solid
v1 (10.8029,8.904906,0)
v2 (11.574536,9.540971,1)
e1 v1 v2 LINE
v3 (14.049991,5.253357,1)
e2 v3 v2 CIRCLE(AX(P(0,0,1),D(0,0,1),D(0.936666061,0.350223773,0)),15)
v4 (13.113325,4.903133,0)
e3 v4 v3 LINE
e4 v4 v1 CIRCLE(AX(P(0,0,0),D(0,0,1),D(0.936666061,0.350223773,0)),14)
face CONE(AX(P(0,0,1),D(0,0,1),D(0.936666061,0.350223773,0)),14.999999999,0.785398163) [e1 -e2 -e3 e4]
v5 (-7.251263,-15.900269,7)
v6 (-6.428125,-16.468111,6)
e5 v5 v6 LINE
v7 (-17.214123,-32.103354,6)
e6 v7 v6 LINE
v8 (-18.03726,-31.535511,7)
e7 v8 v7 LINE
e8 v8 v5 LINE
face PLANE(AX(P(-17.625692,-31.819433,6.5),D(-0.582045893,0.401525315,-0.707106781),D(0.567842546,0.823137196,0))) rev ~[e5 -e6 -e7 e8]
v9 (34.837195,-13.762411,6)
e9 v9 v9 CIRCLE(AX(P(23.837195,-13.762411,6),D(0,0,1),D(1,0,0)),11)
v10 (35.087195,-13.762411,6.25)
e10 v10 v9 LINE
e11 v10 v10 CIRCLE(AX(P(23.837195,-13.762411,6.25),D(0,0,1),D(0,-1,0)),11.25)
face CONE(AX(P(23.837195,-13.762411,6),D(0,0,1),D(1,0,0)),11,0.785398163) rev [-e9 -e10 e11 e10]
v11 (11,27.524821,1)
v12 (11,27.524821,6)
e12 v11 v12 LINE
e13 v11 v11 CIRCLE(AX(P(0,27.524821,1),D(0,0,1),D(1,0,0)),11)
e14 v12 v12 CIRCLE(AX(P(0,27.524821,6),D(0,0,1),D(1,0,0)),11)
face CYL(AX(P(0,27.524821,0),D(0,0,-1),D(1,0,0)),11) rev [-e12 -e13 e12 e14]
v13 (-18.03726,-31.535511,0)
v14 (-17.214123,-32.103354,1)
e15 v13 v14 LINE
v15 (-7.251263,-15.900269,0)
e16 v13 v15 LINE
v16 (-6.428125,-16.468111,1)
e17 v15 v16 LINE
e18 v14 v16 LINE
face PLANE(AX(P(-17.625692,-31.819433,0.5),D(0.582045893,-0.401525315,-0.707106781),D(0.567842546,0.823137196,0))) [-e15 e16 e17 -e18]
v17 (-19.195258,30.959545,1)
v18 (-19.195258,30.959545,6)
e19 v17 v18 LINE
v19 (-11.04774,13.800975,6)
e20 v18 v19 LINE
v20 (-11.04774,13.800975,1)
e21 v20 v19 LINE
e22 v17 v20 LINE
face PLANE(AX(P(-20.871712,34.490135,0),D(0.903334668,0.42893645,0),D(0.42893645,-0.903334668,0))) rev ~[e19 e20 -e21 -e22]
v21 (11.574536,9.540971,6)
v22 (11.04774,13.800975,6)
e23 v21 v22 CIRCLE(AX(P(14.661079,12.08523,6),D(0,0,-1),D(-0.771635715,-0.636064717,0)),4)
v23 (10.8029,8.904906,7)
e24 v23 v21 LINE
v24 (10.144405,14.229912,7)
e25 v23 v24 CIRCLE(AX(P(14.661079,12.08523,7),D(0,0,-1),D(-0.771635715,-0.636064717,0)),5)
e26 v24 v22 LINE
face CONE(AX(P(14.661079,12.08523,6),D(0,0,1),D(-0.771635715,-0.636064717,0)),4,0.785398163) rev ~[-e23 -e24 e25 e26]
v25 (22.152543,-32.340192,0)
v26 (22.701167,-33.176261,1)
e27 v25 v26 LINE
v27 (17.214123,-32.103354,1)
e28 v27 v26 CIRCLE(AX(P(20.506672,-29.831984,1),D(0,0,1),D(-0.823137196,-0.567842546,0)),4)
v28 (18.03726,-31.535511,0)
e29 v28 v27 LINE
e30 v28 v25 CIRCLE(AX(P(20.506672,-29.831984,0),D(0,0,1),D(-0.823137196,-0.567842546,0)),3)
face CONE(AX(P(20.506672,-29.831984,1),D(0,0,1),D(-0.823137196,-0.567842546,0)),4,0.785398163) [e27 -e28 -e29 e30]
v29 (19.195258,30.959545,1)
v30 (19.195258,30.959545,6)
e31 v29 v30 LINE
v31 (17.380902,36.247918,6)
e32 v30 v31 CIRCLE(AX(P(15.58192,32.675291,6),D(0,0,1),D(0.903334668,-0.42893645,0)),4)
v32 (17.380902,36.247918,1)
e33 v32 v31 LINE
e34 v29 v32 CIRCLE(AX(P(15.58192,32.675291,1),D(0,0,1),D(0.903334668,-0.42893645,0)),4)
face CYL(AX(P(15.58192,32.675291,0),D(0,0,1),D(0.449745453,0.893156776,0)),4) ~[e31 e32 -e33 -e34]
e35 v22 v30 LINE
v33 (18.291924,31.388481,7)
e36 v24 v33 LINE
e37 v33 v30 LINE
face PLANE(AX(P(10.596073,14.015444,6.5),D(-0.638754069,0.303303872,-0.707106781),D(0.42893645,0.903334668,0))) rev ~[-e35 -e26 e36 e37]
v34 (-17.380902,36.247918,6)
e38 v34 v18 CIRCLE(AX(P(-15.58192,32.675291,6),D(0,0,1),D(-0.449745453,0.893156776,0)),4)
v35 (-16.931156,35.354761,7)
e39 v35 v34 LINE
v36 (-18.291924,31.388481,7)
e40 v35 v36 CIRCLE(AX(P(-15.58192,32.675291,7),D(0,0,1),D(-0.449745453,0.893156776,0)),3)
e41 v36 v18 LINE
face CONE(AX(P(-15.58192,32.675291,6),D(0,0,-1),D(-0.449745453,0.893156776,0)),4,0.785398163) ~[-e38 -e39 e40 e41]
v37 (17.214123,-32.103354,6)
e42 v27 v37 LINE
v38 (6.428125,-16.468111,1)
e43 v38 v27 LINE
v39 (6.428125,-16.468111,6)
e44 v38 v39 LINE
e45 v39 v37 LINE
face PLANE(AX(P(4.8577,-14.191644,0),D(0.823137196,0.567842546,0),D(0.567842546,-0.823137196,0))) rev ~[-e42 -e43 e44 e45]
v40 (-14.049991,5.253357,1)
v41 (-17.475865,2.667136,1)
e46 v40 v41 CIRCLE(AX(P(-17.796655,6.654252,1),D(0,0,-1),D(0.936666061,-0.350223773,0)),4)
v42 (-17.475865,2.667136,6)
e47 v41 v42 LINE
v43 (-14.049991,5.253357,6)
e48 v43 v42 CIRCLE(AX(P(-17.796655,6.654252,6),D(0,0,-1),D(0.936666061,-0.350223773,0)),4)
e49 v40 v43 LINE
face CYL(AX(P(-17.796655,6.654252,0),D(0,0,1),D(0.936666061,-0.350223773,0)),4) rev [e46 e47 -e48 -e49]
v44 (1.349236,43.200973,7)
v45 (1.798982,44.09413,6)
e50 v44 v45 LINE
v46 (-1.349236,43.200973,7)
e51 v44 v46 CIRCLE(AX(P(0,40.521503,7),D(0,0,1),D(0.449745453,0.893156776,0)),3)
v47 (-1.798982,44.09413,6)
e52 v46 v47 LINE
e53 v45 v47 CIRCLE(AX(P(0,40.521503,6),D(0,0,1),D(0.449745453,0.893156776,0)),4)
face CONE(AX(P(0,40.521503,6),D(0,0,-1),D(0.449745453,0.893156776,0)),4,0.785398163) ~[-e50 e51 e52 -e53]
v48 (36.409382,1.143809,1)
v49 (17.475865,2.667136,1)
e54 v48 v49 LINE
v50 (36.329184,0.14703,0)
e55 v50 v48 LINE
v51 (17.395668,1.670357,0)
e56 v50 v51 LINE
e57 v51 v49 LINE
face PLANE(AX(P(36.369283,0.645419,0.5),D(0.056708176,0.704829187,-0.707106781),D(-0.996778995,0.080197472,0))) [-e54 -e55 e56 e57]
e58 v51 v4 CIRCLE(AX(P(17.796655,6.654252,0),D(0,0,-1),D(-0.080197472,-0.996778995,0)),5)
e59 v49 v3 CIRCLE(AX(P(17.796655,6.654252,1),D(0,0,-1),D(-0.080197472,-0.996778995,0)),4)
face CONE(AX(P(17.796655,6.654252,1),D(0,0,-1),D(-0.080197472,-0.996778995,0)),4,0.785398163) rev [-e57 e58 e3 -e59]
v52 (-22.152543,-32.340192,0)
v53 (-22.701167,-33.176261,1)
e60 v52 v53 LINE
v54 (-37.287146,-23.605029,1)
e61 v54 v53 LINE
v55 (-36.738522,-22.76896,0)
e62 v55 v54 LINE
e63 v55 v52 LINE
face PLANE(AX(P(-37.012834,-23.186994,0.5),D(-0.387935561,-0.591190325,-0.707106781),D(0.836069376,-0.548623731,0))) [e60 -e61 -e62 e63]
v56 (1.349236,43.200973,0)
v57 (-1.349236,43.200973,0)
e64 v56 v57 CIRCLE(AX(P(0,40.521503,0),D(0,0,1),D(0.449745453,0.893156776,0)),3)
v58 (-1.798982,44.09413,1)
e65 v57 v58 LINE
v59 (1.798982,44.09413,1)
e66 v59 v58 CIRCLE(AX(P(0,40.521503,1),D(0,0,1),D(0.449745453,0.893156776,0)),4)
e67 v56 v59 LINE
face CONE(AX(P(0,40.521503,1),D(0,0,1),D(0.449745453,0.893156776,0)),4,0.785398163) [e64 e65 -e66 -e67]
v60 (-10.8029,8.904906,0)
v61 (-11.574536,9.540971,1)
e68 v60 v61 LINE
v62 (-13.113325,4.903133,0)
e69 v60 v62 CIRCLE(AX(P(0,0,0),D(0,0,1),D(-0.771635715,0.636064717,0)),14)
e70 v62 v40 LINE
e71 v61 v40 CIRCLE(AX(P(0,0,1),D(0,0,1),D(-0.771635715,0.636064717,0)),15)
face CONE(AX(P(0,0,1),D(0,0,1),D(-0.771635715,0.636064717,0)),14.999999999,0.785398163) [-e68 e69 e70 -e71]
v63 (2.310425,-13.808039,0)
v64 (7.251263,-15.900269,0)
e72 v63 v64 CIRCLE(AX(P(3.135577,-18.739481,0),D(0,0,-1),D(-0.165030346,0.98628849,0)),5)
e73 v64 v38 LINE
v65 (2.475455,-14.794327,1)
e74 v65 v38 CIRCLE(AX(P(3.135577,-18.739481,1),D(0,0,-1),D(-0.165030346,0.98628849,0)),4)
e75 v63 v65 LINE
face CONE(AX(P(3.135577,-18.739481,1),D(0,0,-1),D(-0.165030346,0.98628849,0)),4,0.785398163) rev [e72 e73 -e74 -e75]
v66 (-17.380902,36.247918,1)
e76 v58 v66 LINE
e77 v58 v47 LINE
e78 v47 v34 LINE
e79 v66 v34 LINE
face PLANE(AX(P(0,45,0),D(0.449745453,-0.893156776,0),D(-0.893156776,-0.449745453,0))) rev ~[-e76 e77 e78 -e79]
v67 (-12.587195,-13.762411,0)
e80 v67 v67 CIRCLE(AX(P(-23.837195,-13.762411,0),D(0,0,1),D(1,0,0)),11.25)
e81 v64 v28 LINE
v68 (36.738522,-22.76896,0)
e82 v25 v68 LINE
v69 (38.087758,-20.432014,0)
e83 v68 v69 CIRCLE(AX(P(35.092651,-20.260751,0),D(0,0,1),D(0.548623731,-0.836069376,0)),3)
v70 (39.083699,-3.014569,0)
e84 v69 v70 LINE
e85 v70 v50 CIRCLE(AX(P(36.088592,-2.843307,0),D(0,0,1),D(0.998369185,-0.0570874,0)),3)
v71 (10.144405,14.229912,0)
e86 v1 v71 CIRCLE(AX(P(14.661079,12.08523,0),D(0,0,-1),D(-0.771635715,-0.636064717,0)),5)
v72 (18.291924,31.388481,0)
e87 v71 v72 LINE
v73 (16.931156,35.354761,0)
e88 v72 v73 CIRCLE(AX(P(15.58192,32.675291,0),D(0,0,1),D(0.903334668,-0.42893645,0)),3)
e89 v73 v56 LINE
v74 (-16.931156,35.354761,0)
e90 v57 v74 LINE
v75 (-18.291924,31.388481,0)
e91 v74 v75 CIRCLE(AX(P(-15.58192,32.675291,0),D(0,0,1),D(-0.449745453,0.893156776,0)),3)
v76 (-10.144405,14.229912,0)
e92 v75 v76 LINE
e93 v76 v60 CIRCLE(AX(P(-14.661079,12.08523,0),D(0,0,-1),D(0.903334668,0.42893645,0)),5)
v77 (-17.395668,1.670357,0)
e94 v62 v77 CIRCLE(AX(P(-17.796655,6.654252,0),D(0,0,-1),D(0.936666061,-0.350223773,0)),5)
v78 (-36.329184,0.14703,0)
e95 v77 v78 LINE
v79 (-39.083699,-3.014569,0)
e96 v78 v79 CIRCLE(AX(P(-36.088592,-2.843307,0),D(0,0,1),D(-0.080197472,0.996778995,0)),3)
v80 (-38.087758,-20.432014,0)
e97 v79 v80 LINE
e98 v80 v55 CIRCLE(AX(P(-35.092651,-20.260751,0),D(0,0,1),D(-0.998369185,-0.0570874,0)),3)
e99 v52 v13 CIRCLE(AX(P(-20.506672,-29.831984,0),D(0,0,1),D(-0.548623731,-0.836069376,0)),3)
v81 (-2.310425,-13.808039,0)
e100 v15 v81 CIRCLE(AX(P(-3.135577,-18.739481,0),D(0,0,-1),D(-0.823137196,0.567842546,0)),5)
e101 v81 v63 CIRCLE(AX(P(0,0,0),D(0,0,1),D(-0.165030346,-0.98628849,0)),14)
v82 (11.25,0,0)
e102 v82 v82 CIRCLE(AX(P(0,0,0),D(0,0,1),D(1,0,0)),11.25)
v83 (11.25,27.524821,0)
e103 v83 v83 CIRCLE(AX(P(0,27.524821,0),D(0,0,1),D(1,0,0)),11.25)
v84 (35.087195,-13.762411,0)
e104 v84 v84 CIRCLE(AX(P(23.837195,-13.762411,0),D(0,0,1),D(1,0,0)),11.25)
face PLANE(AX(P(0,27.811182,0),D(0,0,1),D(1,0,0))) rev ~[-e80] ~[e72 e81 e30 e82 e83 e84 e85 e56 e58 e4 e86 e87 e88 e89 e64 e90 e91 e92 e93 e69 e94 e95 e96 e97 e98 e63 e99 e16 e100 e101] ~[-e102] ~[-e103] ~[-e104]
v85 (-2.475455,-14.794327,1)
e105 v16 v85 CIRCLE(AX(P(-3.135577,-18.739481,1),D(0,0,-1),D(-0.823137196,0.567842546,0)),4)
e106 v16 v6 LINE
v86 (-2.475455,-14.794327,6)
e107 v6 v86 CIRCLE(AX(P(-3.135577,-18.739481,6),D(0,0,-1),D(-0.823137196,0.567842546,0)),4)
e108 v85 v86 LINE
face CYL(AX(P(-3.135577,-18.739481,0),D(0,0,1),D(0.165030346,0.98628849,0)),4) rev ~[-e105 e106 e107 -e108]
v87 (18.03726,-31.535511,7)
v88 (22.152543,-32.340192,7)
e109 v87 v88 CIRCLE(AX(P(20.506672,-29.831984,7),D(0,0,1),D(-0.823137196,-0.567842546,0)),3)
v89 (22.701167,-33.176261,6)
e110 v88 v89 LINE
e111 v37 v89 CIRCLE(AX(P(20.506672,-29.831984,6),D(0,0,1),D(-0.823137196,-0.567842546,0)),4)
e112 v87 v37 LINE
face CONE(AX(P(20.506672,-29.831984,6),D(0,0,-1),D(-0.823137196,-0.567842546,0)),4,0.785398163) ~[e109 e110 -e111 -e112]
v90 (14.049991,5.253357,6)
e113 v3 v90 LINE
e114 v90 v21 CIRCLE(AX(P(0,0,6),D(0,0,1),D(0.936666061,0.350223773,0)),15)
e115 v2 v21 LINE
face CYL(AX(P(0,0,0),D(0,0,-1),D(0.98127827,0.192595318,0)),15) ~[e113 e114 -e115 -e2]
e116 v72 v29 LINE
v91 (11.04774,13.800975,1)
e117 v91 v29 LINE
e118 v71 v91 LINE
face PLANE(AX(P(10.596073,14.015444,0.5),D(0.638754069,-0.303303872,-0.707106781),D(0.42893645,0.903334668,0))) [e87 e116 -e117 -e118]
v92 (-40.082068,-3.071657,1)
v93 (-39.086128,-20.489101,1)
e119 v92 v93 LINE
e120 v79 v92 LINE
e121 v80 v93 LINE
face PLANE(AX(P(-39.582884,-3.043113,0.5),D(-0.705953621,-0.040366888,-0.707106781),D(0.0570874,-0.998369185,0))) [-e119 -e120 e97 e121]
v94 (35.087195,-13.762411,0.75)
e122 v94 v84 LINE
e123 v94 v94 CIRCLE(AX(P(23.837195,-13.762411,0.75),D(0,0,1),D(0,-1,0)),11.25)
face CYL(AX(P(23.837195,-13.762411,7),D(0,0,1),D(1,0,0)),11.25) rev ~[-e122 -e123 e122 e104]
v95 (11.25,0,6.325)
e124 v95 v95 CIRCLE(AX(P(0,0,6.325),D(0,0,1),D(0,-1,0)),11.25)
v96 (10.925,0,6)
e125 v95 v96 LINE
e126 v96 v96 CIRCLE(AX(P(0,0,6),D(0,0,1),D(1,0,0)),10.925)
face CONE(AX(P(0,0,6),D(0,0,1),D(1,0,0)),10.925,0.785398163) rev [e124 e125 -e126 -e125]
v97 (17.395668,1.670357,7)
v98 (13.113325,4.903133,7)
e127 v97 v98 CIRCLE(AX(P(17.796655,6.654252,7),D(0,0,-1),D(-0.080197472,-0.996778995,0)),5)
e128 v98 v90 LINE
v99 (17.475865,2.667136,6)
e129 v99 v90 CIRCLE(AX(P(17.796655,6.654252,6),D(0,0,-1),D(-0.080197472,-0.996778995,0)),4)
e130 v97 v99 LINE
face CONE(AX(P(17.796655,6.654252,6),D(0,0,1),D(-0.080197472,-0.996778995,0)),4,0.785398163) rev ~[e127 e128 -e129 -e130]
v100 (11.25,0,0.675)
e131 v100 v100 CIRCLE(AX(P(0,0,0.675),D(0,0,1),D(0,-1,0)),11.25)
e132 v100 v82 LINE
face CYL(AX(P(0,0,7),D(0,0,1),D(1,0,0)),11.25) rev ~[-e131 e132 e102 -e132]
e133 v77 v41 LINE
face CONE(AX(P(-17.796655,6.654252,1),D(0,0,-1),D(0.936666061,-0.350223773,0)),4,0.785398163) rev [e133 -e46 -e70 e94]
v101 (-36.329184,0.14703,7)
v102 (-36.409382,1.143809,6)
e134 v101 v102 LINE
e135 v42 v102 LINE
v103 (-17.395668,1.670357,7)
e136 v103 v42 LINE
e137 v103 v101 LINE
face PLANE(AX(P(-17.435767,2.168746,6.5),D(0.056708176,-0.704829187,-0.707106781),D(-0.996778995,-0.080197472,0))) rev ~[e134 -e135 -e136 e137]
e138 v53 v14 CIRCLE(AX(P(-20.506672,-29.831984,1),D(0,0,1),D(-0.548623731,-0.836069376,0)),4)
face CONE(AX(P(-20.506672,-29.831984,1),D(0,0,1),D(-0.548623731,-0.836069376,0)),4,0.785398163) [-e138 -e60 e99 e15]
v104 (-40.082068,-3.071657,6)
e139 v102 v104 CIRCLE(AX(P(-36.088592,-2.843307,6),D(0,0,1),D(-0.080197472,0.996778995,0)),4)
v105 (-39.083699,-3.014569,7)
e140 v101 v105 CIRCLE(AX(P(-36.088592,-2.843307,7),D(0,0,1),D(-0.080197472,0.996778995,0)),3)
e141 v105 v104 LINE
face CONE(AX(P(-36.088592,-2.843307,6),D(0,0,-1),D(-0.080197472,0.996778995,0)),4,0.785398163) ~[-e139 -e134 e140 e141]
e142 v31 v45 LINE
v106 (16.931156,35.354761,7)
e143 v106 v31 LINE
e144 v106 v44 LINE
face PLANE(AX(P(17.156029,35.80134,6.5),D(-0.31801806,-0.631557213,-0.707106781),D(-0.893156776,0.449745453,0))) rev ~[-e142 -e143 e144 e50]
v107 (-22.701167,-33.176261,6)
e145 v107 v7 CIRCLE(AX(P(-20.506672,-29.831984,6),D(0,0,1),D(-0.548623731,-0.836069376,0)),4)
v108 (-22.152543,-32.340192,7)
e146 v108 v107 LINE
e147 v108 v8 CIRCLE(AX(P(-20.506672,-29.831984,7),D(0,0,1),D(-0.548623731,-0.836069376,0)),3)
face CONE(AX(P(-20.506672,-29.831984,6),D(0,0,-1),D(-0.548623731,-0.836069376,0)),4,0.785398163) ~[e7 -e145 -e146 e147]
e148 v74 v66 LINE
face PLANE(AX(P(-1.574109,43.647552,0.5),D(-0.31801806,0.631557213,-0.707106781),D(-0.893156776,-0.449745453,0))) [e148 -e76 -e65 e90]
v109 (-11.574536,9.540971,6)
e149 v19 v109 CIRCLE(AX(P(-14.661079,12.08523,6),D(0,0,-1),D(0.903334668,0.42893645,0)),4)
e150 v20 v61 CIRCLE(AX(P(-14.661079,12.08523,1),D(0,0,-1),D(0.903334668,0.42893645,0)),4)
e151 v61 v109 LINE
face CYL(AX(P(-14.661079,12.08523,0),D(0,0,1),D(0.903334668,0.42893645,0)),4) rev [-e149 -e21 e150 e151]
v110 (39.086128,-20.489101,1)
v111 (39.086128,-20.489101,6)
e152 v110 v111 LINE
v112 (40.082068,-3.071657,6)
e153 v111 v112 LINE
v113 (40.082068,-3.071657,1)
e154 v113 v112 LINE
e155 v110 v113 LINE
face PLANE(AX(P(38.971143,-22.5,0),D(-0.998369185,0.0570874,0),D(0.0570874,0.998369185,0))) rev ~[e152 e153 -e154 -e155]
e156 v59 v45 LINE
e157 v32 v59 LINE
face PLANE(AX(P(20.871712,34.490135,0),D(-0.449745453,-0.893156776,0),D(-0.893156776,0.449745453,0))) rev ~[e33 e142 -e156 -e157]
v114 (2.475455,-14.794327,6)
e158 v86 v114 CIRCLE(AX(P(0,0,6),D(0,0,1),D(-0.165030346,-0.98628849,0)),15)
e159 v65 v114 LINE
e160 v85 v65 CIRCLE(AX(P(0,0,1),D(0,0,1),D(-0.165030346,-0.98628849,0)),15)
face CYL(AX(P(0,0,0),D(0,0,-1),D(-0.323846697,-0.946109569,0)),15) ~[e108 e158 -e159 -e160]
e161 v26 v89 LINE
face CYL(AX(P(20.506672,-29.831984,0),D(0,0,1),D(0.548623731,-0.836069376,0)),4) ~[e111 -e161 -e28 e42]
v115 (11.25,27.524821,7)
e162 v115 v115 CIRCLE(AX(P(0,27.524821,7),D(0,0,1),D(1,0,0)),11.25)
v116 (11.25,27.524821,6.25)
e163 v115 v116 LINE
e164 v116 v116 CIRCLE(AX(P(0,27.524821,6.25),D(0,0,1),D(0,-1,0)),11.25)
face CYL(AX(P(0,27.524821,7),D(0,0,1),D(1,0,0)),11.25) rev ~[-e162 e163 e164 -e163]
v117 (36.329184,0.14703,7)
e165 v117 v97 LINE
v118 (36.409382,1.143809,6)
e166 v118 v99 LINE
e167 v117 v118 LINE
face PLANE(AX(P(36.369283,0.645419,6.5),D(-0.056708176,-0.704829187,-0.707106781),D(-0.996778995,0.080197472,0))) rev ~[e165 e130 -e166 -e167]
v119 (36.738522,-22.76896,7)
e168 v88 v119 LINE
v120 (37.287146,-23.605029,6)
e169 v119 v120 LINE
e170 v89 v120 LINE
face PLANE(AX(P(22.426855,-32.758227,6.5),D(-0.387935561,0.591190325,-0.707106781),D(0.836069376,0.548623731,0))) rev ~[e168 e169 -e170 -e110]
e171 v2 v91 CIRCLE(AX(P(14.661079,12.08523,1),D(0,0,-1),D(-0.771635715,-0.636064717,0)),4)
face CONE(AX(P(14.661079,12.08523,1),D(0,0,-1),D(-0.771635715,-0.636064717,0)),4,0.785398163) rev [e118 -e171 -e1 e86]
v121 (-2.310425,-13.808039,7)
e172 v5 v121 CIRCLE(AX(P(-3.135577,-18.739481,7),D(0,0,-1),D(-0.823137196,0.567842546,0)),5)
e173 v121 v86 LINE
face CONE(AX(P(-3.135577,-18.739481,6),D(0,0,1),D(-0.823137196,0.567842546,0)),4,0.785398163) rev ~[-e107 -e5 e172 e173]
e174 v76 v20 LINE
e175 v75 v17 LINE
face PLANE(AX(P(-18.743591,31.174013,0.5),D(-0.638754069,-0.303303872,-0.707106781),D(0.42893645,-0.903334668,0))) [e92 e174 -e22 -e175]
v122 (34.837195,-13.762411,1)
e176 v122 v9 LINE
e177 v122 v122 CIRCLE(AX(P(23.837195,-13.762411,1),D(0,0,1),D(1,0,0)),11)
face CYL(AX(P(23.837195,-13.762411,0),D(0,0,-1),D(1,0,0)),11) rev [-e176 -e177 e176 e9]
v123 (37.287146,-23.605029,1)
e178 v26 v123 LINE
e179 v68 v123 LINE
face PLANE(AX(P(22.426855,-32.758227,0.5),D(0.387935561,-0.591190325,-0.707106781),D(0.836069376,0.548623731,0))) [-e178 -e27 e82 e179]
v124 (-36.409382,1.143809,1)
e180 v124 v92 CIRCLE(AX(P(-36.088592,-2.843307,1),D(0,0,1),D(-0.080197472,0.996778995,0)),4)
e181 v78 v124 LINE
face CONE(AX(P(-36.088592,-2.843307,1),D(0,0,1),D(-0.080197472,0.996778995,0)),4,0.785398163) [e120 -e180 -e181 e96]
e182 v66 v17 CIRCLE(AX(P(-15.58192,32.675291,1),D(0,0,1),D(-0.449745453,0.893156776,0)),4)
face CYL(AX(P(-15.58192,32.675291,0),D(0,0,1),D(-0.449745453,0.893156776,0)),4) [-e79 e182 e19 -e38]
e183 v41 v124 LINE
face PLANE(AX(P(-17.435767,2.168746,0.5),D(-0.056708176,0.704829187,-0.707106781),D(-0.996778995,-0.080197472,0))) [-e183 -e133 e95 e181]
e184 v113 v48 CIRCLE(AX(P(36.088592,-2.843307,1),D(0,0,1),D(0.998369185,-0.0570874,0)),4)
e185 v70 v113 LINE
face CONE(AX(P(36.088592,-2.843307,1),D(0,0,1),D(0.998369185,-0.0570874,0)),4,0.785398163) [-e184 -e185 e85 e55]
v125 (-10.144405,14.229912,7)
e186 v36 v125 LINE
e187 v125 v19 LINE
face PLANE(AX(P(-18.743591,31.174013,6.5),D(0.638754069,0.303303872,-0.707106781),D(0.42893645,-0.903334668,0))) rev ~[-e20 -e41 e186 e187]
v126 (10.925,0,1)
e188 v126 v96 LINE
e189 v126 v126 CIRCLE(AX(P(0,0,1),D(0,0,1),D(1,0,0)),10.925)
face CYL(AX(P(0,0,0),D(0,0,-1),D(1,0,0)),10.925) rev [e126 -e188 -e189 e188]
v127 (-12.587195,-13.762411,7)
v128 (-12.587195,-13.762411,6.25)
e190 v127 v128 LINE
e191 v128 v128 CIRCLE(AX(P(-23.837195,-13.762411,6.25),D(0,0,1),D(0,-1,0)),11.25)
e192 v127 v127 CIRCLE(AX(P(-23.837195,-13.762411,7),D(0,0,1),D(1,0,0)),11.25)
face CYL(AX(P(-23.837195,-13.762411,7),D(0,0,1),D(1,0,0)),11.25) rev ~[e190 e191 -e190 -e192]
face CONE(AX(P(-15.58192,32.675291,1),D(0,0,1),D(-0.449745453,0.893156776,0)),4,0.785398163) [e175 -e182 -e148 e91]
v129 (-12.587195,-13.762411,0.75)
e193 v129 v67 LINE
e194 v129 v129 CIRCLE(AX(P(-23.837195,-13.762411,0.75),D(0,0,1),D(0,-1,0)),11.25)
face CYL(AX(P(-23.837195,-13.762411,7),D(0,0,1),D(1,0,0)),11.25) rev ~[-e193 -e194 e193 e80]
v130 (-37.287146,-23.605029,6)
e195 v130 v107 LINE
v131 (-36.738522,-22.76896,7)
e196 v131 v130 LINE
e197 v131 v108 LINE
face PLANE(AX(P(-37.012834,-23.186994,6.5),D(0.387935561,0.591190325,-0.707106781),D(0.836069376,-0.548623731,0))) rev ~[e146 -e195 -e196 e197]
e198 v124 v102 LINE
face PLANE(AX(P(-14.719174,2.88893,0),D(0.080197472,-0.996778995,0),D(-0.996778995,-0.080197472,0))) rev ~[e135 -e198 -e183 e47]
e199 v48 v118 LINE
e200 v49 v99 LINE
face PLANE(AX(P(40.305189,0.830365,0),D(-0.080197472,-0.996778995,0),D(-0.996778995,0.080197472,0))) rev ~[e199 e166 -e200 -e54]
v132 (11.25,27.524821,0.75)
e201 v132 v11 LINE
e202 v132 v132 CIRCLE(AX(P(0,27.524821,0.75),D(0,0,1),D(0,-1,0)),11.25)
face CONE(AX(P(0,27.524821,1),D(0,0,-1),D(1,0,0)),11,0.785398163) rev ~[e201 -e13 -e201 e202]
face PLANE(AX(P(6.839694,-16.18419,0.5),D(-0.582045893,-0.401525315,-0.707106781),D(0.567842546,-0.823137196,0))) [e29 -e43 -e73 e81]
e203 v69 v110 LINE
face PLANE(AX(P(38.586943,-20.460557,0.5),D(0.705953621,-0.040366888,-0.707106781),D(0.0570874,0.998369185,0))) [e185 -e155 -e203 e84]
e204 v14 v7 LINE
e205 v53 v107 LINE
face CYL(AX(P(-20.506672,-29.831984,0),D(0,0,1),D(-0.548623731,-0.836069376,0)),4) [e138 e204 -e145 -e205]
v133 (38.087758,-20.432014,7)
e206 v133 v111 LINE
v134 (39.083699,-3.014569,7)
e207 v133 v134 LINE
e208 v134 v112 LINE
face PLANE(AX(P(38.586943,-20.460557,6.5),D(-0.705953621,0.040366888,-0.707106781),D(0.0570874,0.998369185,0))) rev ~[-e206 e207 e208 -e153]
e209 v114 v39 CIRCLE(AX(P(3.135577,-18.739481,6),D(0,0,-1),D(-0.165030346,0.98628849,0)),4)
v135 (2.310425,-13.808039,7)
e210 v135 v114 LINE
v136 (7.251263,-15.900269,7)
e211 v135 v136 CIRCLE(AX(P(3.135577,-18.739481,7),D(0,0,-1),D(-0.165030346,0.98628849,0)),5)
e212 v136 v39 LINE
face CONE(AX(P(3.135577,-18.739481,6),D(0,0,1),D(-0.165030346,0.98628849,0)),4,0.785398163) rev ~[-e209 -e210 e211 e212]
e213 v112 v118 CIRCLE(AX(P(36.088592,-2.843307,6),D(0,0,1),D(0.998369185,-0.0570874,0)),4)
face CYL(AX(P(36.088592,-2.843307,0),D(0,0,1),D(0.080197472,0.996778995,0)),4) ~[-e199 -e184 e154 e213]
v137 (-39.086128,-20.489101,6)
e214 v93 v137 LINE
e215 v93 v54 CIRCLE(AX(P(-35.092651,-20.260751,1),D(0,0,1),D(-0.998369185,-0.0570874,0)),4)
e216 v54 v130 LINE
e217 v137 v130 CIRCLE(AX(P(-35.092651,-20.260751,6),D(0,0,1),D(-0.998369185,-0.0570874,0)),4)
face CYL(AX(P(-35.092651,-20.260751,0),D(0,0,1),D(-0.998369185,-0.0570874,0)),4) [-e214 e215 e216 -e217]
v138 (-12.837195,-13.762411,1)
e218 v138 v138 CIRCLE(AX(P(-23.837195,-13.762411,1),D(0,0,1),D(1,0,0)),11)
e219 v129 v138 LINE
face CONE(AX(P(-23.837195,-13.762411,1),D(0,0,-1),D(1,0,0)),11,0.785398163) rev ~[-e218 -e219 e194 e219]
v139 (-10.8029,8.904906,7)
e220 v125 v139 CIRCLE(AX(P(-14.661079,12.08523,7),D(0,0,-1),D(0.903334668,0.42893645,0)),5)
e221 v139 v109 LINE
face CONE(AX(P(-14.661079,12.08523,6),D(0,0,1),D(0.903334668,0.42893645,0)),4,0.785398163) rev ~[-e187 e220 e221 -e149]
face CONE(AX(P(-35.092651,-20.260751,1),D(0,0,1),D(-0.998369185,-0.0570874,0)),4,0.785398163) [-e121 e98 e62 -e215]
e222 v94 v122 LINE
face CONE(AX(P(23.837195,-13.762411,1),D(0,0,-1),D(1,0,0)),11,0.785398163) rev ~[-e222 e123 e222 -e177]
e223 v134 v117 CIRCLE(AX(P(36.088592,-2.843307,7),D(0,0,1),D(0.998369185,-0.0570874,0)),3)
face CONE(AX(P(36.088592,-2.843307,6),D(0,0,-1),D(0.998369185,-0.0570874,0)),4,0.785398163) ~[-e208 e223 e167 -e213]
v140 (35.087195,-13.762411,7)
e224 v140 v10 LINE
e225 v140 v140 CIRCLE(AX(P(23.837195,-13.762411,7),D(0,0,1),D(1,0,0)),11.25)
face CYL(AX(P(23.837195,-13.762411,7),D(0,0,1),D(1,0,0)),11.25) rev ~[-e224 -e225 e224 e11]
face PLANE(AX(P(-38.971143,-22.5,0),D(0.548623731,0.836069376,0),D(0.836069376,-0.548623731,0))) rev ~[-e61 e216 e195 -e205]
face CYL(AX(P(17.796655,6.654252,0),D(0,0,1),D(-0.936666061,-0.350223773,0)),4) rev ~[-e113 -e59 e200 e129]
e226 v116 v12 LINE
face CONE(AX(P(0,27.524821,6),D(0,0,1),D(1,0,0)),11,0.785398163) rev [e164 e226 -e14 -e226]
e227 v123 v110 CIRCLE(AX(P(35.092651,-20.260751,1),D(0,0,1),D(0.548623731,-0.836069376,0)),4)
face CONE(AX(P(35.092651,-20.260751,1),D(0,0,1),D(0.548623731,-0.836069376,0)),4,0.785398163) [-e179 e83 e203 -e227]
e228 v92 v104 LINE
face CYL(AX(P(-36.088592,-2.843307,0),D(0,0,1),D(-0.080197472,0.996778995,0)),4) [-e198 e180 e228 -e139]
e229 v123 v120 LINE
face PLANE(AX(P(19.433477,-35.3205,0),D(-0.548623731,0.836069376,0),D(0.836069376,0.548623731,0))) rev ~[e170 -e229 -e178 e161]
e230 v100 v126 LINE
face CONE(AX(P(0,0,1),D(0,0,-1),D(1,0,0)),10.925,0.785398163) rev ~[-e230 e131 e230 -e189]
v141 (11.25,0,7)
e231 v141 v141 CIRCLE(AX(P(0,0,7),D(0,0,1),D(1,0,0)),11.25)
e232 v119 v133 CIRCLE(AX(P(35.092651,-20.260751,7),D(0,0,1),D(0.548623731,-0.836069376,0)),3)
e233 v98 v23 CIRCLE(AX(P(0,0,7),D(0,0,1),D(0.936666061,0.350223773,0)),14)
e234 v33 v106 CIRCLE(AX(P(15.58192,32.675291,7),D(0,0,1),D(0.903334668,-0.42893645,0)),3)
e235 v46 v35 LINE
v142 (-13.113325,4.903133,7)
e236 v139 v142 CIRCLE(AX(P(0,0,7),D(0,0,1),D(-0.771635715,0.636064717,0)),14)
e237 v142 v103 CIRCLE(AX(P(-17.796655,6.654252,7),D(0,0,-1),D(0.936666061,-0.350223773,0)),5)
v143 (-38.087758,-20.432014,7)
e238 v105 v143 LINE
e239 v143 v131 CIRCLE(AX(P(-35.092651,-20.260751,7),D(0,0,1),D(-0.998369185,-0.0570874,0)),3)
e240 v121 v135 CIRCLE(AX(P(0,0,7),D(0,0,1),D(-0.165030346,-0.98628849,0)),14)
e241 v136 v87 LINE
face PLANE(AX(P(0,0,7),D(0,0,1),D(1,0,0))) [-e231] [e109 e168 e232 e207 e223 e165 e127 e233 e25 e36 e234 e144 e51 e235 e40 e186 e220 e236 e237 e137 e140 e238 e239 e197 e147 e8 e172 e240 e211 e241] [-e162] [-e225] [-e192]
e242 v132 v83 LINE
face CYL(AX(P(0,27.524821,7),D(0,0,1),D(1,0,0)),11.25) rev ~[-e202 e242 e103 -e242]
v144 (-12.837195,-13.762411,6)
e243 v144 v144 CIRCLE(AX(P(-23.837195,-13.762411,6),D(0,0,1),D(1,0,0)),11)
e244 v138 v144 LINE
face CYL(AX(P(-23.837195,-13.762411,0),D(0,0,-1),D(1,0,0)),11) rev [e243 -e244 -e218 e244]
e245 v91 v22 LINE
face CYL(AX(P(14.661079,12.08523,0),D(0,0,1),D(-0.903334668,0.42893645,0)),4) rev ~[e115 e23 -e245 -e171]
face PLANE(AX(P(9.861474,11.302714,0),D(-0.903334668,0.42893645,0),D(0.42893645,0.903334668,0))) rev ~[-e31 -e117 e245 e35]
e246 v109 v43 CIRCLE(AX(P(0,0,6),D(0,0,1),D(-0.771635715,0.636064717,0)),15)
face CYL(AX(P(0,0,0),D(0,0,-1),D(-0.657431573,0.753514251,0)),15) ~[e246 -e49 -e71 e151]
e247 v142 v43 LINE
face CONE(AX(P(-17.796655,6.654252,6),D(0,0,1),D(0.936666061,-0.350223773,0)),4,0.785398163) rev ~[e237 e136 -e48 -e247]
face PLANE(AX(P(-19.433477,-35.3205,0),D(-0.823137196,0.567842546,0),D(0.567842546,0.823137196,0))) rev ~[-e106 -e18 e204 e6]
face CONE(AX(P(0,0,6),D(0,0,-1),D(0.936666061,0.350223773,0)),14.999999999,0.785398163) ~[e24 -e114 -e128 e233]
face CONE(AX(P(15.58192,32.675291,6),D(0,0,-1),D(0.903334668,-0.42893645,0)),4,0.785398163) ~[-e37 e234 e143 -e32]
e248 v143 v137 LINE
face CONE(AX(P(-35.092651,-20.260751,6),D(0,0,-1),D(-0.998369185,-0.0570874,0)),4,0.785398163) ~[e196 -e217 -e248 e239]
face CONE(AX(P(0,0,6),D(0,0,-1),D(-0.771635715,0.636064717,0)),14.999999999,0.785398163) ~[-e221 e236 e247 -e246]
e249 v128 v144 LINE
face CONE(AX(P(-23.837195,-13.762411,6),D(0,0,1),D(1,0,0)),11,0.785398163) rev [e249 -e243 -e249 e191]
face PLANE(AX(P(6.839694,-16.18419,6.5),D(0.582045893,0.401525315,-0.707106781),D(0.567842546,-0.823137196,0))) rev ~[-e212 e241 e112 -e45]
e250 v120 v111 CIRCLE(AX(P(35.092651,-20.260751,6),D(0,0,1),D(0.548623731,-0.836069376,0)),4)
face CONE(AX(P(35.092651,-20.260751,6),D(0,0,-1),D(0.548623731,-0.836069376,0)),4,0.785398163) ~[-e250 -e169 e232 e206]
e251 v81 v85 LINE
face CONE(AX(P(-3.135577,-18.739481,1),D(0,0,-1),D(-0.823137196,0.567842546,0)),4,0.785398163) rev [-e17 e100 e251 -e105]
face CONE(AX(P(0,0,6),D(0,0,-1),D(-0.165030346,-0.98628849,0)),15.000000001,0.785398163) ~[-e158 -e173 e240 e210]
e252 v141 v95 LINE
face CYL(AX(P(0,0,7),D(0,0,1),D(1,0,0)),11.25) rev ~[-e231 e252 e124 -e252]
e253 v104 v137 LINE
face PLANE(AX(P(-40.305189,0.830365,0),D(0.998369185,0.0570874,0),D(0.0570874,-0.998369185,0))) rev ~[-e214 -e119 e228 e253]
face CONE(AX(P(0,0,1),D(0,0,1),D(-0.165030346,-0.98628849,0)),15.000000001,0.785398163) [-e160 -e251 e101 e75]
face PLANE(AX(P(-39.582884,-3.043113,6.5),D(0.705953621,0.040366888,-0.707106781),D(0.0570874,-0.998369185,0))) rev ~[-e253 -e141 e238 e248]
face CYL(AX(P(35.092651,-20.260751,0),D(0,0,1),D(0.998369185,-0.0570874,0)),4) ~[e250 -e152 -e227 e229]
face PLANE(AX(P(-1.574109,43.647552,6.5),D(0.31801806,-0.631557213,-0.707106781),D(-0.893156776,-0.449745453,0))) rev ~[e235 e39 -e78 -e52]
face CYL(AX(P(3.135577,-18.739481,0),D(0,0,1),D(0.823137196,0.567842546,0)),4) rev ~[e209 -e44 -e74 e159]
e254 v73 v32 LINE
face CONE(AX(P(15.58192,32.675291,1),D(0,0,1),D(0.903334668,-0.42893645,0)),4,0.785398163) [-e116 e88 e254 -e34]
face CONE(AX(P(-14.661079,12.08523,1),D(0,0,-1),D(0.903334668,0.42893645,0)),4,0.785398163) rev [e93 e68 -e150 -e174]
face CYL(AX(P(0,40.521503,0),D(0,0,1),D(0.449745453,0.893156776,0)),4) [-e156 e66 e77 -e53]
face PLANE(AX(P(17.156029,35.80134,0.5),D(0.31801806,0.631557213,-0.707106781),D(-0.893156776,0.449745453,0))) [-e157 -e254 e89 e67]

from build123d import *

# Parameters (mm, degrees)
F0_R     = 11
F0_R_2   = 10.925
F1_DEPTH = 7
F2_R     = 4
F3_SIZE  = 1
F4_R     = 11.925
F4_R_2   = 11.25
F4_R_3   = 12
F5_DEPTH = 7


# Not quite as in the source:
# - a feature names something its author has since deleted; it is built from what else it names


with BuildPart() as f1:
    # F0 (on Top) → F1 (new body)
    with BuildSketch(Plane.XY):
        with BuildLine():
            Line((20.8717118949, 34.490134567), (0, 45))
            Line((0, 45), (-20.8717118949, 34.490134567))
            Line((-20.8717118949, 34.490134567), (-9.8614735953, 11.3027137683))
            ThreePointArc((-9.8614735953, 11.3027137683), (0, 15), (9.8614735953, 11.3027137683))
            Line((9.8614735953, 11.3027137683), (20.8717118949, 34.490134567))
        make_face()
        with Locations((0, 27.5248214602)):
            Circle(F0_R, mode=Mode.SUBTRACT)
        with BuildLine():
            ThreePointArc((9.8614735953, 11.3027137683), (0, 15), (-9.8614735953, 11.3027137683))
            ThreePointArc((-9.8614735953, 11.3027137683), (-12.9903810568, 7.5), (-14.7191740527, 2.8889297681))
            ThreePointArc((-14.7191740527, 2.8889297681), (-12.9903810568, -7.5), (-4.8577004574, -14.1916435365))
            ThreePointArc((-4.8577004574, -14.1916435365), (0, -15), (4.8577004574, -14.1916435365))
            ThreePointArc((4.8577004574, -14.1916435365), (12.2038007781, -8.7216538896), (15, 0))
            ThreePointArc((15, 0), (14.9296284413, 1.4512734423), (14.7191740527, 2.8889297681))
            ThreePointArc((14.7191740527, 2.8889297681), (12.9903810568, 7.5), (9.8614735953, 11.3027137683))
        make_face()
        Circle(F0_R_2, mode=Mode.SUBTRACT)
        with BuildLine():
            ThreePointArc((-4.8577004574, -14.1916435365), (-12.9903810568, -7.5), (-14.7191740527, 2.8889297681))
            Line((-14.7191740527, 2.8889297681), (-40.3051886624, 0.8303654379))
            Line((-40.3051886624, 0.8303654379), (-38.9711431703, -22.5))
            Line((-38.9711431703, -22.5), (-19.4334767676, -35.3205000049))
            Line((-19.4334767676, -35.3205000049), (-4.8577004574, -14.1916435365))
        make_face()
        with Locations((-23.8371946192, -13.7624107301)):
            Circle(F0_R, mode=Mode.SUBTRACT)
        with BuildLine():
            Line((40.3051886624, 0.8303654379), (14.7191740527, 2.8889297681))
            ThreePointArc((14.7191740527, 2.8889297681), (14.9296284413, 1.4512734423), (15, 0))
            ThreePointArc((15, 0), (12.2038007781, -8.7216538896), (4.8577004574, -14.1916435365))
            Line((4.8577004574, -14.1916435365), (19.4334767676, -35.3205000049))
            Line((19.4334767676, -35.3205000049), (38.9711431703, -22.5))
            Line((38.9711431703, -22.5), (40.3051886624, 0.8303654379))
        make_face()
        with Locations((23.8371946192, -13.7624107301)):
            Circle(F0_R, mode=Mode.SUBTRACT)
    extrude(amount=F1_DEPTH)

    # F2
    f2_edges = [f1.edges().sort_by_distance(p)[0] for p in [
        (9.861474, 11.302714, 3.5),
        (-9.861474, 11.302714, 3.5),
        (14.719174, 2.88893, 3.5),
        (4.8577, -14.191644, 3.5),
        (-4.8577, -14.191644, 3.5),
        (-14.719174, 2.88893, 3.5),
        (20.871712, 34.490135, 3.5),
        (0, 45, 3.5),
        (-20.871712, 34.490135, 3.5),
        (19.433477, -35.3205, 3.5),
        (38.971143, -22.5, 3.5),
        (40.305189, 0.830365, 3.5),
        (-19.433477, -35.3205, 3.5),
        (-38.971143, -22.5, 3.5),
        (-40.305189, 0.830365, 3.5),
    ]]
    fillet(f2_edges, radius=F2_R)

    # F3
    f3_edges = [f1.edges().sort_by_distance(p)[0] for p in [
        (-15.121499, 22.38026, 7),
        (-15.121499, 22.38026, 0),
        (-39.584098, -11.780379, 7),
        (-29.994156, -28.390645, 7),
        (15.121499, 22.38026, 7),
        (10.691316, 11.594325, 7),
        (19.36544, 33.973357, 7),
        (12.990381, 7.5, 7),
        (9.589942, 40.171024, 7),
        (15.386638, 3.461789, 7),
        (0, 44.521503, 7),
        (26.942623, 1.905472, 7),
        (-9.589942, 40.171024, 7),
        (39.10451, -0.215715, 7),
        (-19.36544, 33.973357, 7),
        (39.584098, -11.780379, 7),
        (38.556753, -22.260751, 7),
        (-10.691316, 11.594325, 7),
        (29.994156, -28.390645, 7),
        (-12.990381, 7.5, 7),
        (19.73907, -33.757641, 7),
        (-15.386638, 3.461789, 7),
        (11.821124, -24.285733, 7),
        (-26.942623, 1.905472, 7),
        (4.695322, -15.056114, 7),
        (-39.10451, -0.215715, 7),
        (0, -15, 7),
        (-4.695322, -15.056114, 7),
        (-38.556753, -22.260751, 7),
        (-11.821124, -24.285733, 7),
        (-19.73907, -33.757641, 7),
        (-11, 27.524821, 7),
        (-10.925, 0, 7),
        (-34.837195, -13.762411, 7),
        (12.837195, -13.762411, 7),
        (15.121499, 22.38026, 0),
        (10.691316, 11.594325, 0),
        (19.36544, 33.973357, 0),
        (12.990381, 7.5, 0),
        (9.589942, 40.171024, 0),
        (15.386638, 3.461789, 0),
        (0, 44.521503, 0),
        (26.942623, 1.905472, 0),
        (-9.589942, 40.171024, 0),
        (39.10451, -0.215715, 0),
        (-19.36544, 33.973357, 0),
        (39.584098, -11.780379, 0),
        (38.556753, -22.260751, 0),
        (-10.691316, 11.594325, 0),
        (29.994156, -28.390645, 0),
        (-12.990381, 7.5, 0),
        (19.73907, -33.757641, 0),
        (-15.386638, 3.461789, 0),
        (11.821124, -24.285733, 0),
        (-26.942623, 1.905472, 0),
        (4.695322, -15.056114, 0),
        (-39.10451, -0.215715, 0),
        (0, -15, 0),
        (-39.584098, -11.780379, 0),
        (-4.695322, -15.056114, 0),
        (-38.556753, -22.260751, 0),
        (-11.821124, -24.285733, 0),
        (-29.994156, -28.390645, 0),
        (-19.73907, -33.757641, 0),
        (-11, 27.524821, 0),
        (-10.925, 0, 0),
        (-34.837195, -13.762411, 0),
        (12.837195, -13.762411, 0),
    ]]
    chamfer(f3_edges, length=F3_SIZE)

    # F4 (on face) → F5 (join)
    with BuildSketch(Plane.XY.offset(7)):
        Circle(F4_R)
        Circle(F4_R_2, mode=Mode.SUBTRACT)
        with Locations((0, 27.5248214602)):
            Circle(F4_R_3)
        with Locations((0, 27.5248214602)):
            Circle(F4_R_2, mode=Mode.SUBTRACT)
        with Locations((-23.8371946192, -13.7624107301)):
            Circle(F4_R_3)
        with Locations((-23.8371946192, -13.7624107301)):
            Circle(F4_R_2, mode=Mode.SUBTRACT)
        with Locations((23.8371946192, -13.7624107301)):
            Circle(F4_R_3)
        with Locations((23.8371946192, -13.7624107301)):
            Circle(F4_R_2, mode=Mode.SUBTRACT)
    extrude(amount=-F5_DEPTH)


solid = f1.part
